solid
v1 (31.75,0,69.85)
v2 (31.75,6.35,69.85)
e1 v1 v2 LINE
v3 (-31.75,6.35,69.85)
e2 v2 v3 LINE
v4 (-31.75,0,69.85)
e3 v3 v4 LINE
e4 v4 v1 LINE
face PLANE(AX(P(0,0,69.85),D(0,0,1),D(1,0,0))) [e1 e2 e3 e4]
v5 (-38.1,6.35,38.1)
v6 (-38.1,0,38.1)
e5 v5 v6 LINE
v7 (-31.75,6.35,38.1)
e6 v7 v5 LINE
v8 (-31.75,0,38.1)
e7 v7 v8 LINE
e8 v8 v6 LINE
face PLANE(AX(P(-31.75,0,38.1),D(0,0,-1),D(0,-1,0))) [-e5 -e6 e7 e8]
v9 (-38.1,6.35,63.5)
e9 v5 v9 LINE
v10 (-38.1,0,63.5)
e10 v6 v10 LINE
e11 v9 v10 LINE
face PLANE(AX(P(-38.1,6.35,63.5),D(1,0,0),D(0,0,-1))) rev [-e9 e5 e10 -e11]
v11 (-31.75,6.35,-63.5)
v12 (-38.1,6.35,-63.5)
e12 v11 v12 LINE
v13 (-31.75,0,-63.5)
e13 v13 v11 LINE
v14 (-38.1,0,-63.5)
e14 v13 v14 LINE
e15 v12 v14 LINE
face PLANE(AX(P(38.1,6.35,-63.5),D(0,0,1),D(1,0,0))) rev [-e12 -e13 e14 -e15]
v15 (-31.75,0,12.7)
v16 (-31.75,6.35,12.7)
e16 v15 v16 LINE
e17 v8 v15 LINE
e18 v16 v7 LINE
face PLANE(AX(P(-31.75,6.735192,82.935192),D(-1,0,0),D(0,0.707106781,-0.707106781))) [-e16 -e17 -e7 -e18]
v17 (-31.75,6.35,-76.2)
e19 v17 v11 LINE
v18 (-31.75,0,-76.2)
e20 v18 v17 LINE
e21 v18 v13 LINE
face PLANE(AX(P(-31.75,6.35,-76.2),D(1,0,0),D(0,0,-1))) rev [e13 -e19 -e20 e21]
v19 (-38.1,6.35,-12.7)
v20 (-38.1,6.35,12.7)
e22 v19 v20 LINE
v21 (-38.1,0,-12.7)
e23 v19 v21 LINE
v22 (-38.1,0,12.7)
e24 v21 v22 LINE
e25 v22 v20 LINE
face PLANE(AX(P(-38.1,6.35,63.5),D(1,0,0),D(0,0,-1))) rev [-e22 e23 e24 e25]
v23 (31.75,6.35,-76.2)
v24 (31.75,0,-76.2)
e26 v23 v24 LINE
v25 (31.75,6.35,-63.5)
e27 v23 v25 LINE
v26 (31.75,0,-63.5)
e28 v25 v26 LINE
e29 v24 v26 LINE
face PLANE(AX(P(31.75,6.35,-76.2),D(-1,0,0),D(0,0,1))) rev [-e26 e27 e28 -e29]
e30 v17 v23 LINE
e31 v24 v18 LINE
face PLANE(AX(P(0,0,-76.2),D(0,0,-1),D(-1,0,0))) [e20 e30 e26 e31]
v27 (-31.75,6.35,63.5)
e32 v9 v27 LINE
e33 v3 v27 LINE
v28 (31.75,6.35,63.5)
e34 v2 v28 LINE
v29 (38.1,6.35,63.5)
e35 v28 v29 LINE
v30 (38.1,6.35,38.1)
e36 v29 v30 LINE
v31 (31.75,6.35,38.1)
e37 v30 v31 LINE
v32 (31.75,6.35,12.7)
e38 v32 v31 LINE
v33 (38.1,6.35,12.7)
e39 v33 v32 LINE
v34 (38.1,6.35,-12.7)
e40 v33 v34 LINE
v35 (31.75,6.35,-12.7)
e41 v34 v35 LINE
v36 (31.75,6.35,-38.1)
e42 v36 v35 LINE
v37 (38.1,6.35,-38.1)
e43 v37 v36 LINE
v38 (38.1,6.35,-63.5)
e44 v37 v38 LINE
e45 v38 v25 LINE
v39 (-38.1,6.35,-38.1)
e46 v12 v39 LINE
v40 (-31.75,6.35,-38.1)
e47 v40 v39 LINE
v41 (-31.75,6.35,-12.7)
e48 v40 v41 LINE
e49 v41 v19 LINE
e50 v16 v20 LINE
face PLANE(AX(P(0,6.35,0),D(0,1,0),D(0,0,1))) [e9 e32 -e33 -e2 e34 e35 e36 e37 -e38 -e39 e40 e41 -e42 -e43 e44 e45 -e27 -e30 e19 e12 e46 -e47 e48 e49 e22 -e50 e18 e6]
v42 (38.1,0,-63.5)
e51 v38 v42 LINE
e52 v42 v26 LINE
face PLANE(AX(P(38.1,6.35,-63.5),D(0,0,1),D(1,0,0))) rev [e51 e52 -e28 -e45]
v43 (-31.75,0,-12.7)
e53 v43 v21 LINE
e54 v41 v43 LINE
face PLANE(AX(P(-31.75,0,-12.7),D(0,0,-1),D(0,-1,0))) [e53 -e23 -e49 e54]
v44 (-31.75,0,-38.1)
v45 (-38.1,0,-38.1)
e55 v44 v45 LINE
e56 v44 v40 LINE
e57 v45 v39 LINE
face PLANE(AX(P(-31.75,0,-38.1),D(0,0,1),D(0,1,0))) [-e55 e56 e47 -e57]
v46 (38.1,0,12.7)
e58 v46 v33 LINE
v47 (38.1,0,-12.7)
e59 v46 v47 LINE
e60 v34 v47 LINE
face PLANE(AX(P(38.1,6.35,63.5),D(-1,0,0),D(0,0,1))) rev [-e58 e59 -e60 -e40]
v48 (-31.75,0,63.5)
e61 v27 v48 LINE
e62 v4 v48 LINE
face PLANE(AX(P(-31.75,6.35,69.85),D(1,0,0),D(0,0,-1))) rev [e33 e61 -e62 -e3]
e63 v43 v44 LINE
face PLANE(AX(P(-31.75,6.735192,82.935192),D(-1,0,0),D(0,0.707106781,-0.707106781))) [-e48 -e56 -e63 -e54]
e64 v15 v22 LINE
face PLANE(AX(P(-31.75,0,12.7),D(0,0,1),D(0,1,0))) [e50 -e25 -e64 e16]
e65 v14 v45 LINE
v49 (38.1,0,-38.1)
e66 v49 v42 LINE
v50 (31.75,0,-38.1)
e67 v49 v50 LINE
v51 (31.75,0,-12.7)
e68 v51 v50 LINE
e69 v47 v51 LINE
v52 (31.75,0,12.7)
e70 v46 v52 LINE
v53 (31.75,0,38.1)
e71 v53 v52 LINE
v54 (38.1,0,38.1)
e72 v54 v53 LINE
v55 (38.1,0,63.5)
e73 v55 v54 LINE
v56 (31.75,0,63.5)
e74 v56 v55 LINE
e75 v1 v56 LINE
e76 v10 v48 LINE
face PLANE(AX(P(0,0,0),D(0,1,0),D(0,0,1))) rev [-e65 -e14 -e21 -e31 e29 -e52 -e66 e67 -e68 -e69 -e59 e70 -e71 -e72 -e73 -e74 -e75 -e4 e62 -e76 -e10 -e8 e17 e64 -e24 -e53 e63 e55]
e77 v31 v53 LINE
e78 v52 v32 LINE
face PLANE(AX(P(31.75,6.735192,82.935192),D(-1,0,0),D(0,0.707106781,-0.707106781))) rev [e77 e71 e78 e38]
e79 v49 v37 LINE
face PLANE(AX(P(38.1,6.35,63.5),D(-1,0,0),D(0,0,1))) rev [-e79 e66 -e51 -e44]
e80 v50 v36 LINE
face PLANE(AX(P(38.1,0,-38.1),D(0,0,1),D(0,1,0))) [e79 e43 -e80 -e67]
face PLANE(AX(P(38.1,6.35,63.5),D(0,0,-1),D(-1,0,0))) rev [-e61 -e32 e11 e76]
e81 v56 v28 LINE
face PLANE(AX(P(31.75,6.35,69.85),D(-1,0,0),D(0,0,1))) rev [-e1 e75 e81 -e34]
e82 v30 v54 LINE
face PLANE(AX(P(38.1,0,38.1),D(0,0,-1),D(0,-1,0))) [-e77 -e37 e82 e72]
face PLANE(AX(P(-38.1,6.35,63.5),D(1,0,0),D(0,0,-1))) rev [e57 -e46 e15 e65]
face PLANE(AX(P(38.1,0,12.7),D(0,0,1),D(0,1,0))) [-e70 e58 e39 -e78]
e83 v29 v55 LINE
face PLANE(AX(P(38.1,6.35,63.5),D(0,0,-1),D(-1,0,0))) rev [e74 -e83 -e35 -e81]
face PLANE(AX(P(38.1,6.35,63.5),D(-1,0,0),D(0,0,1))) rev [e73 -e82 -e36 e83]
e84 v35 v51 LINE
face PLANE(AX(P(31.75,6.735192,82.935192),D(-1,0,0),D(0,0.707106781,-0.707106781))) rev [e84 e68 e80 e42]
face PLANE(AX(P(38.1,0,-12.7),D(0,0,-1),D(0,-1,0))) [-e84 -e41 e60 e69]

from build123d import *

# Parameters (mm, degrees)
SKETCH1_W           = 76.2
SKETCH1_H           = 127
BOSS_EXTRUDE1_DEPTH = 6.35
CAVITY1_START       = -38.1
CAVITY1_OUTLINE_W   = 6.35
CAVITY1_OUTLINE_H   = 25.4
CAVITY1_DEPTH       = 6.35
CAVITY1_START_2     = 31.75
CAVITY1_2_OUTLINE_W = 6.35
CAVITY1_2_OUTLINE_H = 25.4
CAVITY1_2_DEPTH     = 6.35
SKETCH2_W           = 63.5
SKETCH2_H           = 6.35
BOSS_EXTRUDE2_DEPTH = 6.35
SKETCH3_W           = 63.5
SKETCH3_H           = 6.35
BOSS_EXTRUDE3_DEPTH = 12.7


# Read off the part's stored shape, not the designer's step: Cavity1
with BuildPart() as part:
    # Sketch1 → Boss-Extrude1 (new body)
    with BuildSketch(Plane(origin=(0, 0, 0), x_dir=(1, 0, 0), z_dir=(0, 1, 0))):
        Rectangle(SKETCH1_W, SKETCH1_H)
    extrude(amount=BOSS_EXTRUDE1_DEPTH)

    # Cavity1 outline → Cavity1 (cut)
    with BuildSketch(Plane.YZ.offset(CAVITY1_START)):
        with Locations((3.175, 25.4)):
            Rectangle(CAVITY1_OUTLINE_W, CAVITY1_OUTLINE_H)
        with Locations((3.175, -25.4)):
            Rectangle(CAVITY1_OUTLINE_W, CAVITY1_OUTLINE_H)
    extrude(amount=CAVITY1_DEPTH, mode=Mode.SUBTRACT)

    # Cavity1 2 outline → Cavity1 2 (cut)
    with BuildSketch(Plane.YZ.offset(CAVITY1_START_2)):
        with Locations((3.175, 25.4)):
            Rectangle(CAVITY1_2_OUTLINE_W, CAVITY1_2_OUTLINE_H)
        with Locations((3.175, -25.4)):
            Rectangle(CAVITY1_2_OUTLINE_W, CAVITY1_2_OUTLINE_H)
    extrude(amount=CAVITY1_2_DEPTH, mode=Mode.SUBTRACT)

    # Sketch2 → Boss-Extrude2 (add)
    with BuildSketch(Plane.XY.offset(63.5)):
        with Locations((0, 3.175)):
            Rectangle(SKETCH2_W, SKETCH2_H)
    extrude(amount=BOSS_EXTRUDE2_DEPTH)

    # Sketch3 → Boss-Extrude3 (add)
    with BuildSketch(Plane(origin=(0, 0, -63.5), x_dir=(-1, 0, 0), z_dir=(0, 0, -1))):
        with Locations((0, 3.175)):
            Rectangle(SKETCH3_W, SKETCH3_H)
    extrude(amount=BOSS_EXTRUDE3_DEPTH)


solid = part.part
